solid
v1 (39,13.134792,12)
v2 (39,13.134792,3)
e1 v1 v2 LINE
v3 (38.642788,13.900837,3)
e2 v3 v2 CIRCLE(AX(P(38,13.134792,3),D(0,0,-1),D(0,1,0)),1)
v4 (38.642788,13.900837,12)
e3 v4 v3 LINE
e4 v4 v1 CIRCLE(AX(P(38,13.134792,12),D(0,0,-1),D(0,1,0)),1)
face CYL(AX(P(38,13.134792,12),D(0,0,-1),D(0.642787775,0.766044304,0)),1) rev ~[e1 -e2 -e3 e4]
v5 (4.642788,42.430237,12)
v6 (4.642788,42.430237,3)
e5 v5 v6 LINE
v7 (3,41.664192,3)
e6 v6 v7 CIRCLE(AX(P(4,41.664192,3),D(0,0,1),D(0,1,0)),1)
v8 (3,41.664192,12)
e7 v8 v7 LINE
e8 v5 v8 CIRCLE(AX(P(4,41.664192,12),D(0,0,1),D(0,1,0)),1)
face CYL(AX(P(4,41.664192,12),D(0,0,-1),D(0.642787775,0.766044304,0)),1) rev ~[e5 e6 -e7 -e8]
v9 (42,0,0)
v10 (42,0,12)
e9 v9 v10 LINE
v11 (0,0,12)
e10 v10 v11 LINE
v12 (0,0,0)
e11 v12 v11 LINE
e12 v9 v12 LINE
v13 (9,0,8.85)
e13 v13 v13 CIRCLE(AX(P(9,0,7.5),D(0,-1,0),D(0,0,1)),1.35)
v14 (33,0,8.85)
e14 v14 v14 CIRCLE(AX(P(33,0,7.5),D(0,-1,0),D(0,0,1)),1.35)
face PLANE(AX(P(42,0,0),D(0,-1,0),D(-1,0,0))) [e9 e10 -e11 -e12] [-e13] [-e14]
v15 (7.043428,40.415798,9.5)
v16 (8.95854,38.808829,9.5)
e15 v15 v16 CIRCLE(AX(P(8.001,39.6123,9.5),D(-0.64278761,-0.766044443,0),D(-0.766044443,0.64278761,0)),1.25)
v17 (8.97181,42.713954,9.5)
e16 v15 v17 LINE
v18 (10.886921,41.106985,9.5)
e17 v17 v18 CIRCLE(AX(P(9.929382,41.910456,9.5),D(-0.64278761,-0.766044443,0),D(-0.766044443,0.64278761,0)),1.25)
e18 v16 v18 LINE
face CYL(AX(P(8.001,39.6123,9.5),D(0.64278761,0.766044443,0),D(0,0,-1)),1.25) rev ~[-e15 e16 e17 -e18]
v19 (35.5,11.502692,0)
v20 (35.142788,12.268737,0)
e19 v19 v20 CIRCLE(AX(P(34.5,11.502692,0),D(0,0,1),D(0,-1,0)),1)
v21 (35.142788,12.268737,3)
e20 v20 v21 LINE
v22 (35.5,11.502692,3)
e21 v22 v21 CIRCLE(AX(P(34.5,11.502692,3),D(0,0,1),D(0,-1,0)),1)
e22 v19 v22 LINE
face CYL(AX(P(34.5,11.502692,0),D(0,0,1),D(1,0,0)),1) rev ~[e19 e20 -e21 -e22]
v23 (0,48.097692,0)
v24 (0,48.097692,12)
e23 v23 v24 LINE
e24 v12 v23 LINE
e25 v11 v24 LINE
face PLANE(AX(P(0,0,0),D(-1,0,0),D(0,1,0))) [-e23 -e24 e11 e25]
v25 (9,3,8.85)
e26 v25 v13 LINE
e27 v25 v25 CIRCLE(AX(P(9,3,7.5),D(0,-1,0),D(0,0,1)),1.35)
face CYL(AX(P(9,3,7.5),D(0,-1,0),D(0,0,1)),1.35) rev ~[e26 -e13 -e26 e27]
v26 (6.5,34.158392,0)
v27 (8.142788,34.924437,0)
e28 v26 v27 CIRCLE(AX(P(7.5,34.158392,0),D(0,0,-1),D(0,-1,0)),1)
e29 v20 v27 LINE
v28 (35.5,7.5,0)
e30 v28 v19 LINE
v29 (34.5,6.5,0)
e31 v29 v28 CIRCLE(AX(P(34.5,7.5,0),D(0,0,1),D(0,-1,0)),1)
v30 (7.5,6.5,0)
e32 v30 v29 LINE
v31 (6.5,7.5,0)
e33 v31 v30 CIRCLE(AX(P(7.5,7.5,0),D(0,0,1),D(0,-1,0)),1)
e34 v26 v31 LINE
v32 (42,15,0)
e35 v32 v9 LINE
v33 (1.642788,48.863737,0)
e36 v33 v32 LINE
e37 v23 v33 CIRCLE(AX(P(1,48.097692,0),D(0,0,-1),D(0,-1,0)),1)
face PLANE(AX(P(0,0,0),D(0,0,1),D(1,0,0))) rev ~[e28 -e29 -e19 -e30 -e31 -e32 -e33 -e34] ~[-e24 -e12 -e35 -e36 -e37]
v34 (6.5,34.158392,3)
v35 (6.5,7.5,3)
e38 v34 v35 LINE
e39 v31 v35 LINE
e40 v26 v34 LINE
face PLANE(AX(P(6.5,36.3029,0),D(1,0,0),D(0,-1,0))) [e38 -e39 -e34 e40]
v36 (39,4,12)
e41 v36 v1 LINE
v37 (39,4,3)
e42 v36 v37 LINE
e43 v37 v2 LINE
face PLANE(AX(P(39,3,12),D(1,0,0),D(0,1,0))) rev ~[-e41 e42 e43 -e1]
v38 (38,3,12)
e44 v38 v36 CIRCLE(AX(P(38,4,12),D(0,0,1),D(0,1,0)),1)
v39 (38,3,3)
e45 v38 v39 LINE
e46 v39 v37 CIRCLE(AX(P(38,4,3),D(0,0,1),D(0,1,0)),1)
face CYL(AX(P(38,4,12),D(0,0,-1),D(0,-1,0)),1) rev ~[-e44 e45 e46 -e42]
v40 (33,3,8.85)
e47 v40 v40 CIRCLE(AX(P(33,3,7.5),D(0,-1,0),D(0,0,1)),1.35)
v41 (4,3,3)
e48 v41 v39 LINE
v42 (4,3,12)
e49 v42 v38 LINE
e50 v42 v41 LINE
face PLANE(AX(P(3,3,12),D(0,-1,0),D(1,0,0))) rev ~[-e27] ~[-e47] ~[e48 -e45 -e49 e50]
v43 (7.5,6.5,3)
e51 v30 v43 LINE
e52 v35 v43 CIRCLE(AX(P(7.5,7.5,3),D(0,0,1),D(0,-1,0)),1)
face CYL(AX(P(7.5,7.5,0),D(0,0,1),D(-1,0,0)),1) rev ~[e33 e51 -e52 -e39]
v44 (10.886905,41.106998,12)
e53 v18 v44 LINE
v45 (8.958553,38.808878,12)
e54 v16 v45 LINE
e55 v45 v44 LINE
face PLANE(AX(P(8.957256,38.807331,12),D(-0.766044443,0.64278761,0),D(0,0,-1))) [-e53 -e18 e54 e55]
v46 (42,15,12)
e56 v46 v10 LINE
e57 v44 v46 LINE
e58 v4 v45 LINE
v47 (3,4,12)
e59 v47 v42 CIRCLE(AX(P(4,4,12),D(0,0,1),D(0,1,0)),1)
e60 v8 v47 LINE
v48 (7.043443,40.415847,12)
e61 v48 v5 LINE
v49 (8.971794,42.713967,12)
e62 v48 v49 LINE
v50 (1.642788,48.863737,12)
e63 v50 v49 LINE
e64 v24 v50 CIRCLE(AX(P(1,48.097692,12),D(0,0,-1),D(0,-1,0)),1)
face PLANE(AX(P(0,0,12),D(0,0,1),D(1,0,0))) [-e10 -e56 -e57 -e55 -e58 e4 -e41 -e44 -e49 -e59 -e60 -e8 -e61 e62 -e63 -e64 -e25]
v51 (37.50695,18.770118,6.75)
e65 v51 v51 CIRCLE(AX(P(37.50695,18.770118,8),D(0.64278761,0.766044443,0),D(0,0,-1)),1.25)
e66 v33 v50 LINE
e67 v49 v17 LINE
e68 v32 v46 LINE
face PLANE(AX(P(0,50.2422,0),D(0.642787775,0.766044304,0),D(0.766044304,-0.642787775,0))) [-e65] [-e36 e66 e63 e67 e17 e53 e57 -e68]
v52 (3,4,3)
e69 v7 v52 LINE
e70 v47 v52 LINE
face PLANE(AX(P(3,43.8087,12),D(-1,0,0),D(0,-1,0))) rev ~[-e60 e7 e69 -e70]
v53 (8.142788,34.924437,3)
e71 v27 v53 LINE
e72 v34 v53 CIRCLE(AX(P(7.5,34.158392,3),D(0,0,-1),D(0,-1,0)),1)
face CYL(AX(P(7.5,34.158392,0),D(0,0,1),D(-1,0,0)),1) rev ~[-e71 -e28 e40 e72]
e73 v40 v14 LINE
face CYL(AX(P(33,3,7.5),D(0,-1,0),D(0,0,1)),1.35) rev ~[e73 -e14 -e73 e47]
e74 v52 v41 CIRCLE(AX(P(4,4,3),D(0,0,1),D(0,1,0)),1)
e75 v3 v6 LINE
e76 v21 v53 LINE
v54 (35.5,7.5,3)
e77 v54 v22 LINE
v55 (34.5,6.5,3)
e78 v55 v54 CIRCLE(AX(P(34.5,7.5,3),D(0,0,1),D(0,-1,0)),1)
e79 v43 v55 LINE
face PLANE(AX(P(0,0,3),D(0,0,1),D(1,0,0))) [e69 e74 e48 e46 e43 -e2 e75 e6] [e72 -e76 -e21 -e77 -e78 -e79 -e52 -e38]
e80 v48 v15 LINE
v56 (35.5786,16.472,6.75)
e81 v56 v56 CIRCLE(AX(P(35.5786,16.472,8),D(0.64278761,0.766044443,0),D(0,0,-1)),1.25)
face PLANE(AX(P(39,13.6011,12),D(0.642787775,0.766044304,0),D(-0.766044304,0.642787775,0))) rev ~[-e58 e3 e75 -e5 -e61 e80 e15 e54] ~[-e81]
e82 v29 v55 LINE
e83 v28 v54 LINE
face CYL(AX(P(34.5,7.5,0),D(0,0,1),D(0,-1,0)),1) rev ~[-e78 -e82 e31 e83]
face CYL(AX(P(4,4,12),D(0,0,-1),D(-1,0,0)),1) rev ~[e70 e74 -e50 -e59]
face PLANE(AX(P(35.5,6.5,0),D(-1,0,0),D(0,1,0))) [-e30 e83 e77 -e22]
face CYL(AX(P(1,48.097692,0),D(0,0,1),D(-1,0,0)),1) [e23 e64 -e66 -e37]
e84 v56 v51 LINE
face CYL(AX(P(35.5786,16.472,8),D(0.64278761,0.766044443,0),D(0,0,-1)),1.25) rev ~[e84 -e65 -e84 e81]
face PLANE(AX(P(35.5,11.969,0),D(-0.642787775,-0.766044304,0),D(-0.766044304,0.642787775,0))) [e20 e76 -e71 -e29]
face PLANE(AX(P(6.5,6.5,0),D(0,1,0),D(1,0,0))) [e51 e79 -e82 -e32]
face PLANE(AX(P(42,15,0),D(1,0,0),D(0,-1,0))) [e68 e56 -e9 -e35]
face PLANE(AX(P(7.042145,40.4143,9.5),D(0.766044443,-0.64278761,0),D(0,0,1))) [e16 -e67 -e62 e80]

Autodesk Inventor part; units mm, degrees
ref_plane "YZ Plane" through (0, 0, 0) normal (1, 0, 0) x (0, 1, 0)
ref_plane "XZ Plane" through (0, 0, 0) normal (0, 1, 0) x (-1, 0, 0)
ref_plane "XY Plane" through (0, 0, 0) normal (0, 0, 1) x (1, 0, 0)
sketch "Skizze1" plane through (0, 0, 0) normal (0, 0, 1) x (1, 0, 0)
  line L0 (0, 0) -> (0, 50.2422)
  line L1 (0, 50.2422) -> (42, 15)
  line L2 (42, 15) -> (42, 0)
  line L3 (42, 0) -> (0, 0)
  line L4 (6.5, 36.3029) -> (6.5, 6.5)
  line L5 (6.5, 6.5) -> (35.5, 6.5)
  line L6 (35.5, 6.5) -> (35.5, 11.969)
  line L7 (35.5, 11.969) -> (6.5, 36.3029)
  dimension "d0" = 130
  dimension "d1" = 15
  dimension "d2" = 42
  dimension "d3" = 6.5
  dimension "d4" = 6.5
  dimension "d5" = 6.5
  dimension "d6" = 6.5
extrude "Extrusion1" add sketch "Skizze1" along normal blind 12
sketch "Skizze2" plane through (0, 0, 12) normal (0, 0, 1) x (1, 0, 0)
  line L0 (3, 43.8087) -> (3, 3)
  line L1 (3, 3) -> (39, 3)
  line L2 (39, 3) -> (39, 13.6011)
  line L3 (39, 13.6011) -> (3, 43.8087)
  line L4 (0, 0) -> (42, 0) projected
  line L5 (0, 50.2422) -> (0, 0) projected
  line L6 (42, 15) -> (0, 50.2422) projected
  line L7 (42, 0) -> (42, 15) projected
  dimension "d9" = 3
  dimension "d10" = 3
  dimension "d11" = 3
  dimension "d12" = 3
extrude "Extrusion2" cut sketch "Skizze2" against normal blind 9 contours L3 L2 L1 L0
sketch "Skizze3" plane through (3, 3, 12) normal (0, 1, 0) x (1, 0, 0)
  line L0 (-3, 0) -> (-3, 12) projected
  line L1 (-3, 12) -> (39, 12) projected
  line L2 (39, 12) -> (39, 0) projected
  line L3 (39, 0) -> (36, 0) projected
  line L4 (36, 0) -> (0, 0) projected
  line L5 (0, 0) -> (-3, 0) projected
  line L6 (36, 0) -> (36, 9) projected
  line L7 (36, 9) -> (0, 9) projected
  line L8 (0, 9) -> (0, 0) projected
  line L9 (0, 0) -> (0, 9) projected
  line L10 (36, 0) -> (36, 9) projected
  line L11 (36, 4.5) -> (0, 4.5)
  point P0 (6, 4.5)
  point P1 (30, 4.5)
  dimension "d15" = 6
  dimension "d17" = 6
hole "Bohrung1" at (9, 3, 7.5) at (33, 3, 7.5) direction (0, -1, 0) diameter 2.7 depth 8 tip angle 118
fillet "Rundung1" radius 1 8 edges at (39, 13.6011, 7.5) (35.5, 11.969, 1.5) (3, 43.8087, 7.5) (6.5, 36.3029, 1.5) (6.5, 6.5, 1.5) (3, 3, 7.5) (35.5, 6.5, 1.5) (39, 3, 7.5)
sketch "Skizze4" plane through (4.6428, 42.4302, 3) normal (-0.6427876, -0.7660444, 0) x (0.7660444, -0.6427876, 0)
  line L0 (0, 9) -> (44.3838, 9) projected
  line L1 (44.3838, 9) -> (44.3838, 0) projected
  line L2 (0, 0) -> (0, 9) projected
  point P0 (23.717, -3)
  point P1 (40.3838, 5)
  point P2 (4.3838, 6.5)
  dimension "d26" = 4
  dimension "d27" = 4
  dimension "d28" = 2.5
  dimension "d29" = 40
  dimension "d30" = 4.3838
hole "Bohrung2" at (35.5786, 16.472, 8) at (8.001, 39.6123, 9.5) direction (0.6427876, 0.7660444, 0) diameter 2.5 depth 8 tip angle 118
sketch "Skizze5" plane through (4.6428, 42.4302, 3) normal (-0.6427876, -0.7660444, 0) x (0.7660444, -0.6427876, 0)
  circle A0 centre (4.3838, 6.5) radius 1.25 projected
  line L0 (46.2491, 9) -> (-8.578, 9) projected
  line L1 (3.1338, 6.5) -> (3.1338, 9)
  line L2 (5.6338, 9) -> (5.6338, 6.5)
  point P0 (23.717, -3)
extrude "Extrusion3" cut sketch "Skizze5" against normal blind 15.25 contours A0 L1 L0 L2
sketch "Mutter im Winkel" plane through (0, 0, 12) normal (0, 0, 1) x (1, 0, 0)
  line L0 (0, 50.2422) -> (42, 15) projected
  line L1 (9.9294, 41.9105) -> (4.53, 35.4757)
  line L2 (7.0435, 40.4158) -> (8.9718, 42.7139) projected
  line L3 (8.9586, 38.8088) -> (7.0435, 40.4158) projected
  line L4 (10.2991, 37.684) -> (5.7029, 41.5407)
  line L5 (5.7029, 41.5407) -> (5.3815, 41.1577)
  line L6 (5.3815, 41.1577) -> (9.9777, 37.3009)
  line L7 (9.9777, 37.3009) -> (10.2991, 37.684)
  line L8 (4.6428, 42.4302) -> (38.6428, 13.9008) projected
  line L9 (9.7671, 37.4777) -> (8.4815, 35.9456)
  line L10 (8.4815, 35.9456) -> (4.3066, 39.4488)
  line L11 (4.3066, 39.4488) -> (5.5921, 40.9809)
  point P0 (0, 0)
  dimension "d40" = 1.25
  dimension "d41" = 5.4
  dimension "d43" = 0.5
  dimension "d44" = 6
  dimension "d45" = 5.45
  dimension "d46" = 2
fillet "Rundung2" radius 1 1 edges at (0, 50.2422, 6)
properties part number "oled_halterung_W162_links"
